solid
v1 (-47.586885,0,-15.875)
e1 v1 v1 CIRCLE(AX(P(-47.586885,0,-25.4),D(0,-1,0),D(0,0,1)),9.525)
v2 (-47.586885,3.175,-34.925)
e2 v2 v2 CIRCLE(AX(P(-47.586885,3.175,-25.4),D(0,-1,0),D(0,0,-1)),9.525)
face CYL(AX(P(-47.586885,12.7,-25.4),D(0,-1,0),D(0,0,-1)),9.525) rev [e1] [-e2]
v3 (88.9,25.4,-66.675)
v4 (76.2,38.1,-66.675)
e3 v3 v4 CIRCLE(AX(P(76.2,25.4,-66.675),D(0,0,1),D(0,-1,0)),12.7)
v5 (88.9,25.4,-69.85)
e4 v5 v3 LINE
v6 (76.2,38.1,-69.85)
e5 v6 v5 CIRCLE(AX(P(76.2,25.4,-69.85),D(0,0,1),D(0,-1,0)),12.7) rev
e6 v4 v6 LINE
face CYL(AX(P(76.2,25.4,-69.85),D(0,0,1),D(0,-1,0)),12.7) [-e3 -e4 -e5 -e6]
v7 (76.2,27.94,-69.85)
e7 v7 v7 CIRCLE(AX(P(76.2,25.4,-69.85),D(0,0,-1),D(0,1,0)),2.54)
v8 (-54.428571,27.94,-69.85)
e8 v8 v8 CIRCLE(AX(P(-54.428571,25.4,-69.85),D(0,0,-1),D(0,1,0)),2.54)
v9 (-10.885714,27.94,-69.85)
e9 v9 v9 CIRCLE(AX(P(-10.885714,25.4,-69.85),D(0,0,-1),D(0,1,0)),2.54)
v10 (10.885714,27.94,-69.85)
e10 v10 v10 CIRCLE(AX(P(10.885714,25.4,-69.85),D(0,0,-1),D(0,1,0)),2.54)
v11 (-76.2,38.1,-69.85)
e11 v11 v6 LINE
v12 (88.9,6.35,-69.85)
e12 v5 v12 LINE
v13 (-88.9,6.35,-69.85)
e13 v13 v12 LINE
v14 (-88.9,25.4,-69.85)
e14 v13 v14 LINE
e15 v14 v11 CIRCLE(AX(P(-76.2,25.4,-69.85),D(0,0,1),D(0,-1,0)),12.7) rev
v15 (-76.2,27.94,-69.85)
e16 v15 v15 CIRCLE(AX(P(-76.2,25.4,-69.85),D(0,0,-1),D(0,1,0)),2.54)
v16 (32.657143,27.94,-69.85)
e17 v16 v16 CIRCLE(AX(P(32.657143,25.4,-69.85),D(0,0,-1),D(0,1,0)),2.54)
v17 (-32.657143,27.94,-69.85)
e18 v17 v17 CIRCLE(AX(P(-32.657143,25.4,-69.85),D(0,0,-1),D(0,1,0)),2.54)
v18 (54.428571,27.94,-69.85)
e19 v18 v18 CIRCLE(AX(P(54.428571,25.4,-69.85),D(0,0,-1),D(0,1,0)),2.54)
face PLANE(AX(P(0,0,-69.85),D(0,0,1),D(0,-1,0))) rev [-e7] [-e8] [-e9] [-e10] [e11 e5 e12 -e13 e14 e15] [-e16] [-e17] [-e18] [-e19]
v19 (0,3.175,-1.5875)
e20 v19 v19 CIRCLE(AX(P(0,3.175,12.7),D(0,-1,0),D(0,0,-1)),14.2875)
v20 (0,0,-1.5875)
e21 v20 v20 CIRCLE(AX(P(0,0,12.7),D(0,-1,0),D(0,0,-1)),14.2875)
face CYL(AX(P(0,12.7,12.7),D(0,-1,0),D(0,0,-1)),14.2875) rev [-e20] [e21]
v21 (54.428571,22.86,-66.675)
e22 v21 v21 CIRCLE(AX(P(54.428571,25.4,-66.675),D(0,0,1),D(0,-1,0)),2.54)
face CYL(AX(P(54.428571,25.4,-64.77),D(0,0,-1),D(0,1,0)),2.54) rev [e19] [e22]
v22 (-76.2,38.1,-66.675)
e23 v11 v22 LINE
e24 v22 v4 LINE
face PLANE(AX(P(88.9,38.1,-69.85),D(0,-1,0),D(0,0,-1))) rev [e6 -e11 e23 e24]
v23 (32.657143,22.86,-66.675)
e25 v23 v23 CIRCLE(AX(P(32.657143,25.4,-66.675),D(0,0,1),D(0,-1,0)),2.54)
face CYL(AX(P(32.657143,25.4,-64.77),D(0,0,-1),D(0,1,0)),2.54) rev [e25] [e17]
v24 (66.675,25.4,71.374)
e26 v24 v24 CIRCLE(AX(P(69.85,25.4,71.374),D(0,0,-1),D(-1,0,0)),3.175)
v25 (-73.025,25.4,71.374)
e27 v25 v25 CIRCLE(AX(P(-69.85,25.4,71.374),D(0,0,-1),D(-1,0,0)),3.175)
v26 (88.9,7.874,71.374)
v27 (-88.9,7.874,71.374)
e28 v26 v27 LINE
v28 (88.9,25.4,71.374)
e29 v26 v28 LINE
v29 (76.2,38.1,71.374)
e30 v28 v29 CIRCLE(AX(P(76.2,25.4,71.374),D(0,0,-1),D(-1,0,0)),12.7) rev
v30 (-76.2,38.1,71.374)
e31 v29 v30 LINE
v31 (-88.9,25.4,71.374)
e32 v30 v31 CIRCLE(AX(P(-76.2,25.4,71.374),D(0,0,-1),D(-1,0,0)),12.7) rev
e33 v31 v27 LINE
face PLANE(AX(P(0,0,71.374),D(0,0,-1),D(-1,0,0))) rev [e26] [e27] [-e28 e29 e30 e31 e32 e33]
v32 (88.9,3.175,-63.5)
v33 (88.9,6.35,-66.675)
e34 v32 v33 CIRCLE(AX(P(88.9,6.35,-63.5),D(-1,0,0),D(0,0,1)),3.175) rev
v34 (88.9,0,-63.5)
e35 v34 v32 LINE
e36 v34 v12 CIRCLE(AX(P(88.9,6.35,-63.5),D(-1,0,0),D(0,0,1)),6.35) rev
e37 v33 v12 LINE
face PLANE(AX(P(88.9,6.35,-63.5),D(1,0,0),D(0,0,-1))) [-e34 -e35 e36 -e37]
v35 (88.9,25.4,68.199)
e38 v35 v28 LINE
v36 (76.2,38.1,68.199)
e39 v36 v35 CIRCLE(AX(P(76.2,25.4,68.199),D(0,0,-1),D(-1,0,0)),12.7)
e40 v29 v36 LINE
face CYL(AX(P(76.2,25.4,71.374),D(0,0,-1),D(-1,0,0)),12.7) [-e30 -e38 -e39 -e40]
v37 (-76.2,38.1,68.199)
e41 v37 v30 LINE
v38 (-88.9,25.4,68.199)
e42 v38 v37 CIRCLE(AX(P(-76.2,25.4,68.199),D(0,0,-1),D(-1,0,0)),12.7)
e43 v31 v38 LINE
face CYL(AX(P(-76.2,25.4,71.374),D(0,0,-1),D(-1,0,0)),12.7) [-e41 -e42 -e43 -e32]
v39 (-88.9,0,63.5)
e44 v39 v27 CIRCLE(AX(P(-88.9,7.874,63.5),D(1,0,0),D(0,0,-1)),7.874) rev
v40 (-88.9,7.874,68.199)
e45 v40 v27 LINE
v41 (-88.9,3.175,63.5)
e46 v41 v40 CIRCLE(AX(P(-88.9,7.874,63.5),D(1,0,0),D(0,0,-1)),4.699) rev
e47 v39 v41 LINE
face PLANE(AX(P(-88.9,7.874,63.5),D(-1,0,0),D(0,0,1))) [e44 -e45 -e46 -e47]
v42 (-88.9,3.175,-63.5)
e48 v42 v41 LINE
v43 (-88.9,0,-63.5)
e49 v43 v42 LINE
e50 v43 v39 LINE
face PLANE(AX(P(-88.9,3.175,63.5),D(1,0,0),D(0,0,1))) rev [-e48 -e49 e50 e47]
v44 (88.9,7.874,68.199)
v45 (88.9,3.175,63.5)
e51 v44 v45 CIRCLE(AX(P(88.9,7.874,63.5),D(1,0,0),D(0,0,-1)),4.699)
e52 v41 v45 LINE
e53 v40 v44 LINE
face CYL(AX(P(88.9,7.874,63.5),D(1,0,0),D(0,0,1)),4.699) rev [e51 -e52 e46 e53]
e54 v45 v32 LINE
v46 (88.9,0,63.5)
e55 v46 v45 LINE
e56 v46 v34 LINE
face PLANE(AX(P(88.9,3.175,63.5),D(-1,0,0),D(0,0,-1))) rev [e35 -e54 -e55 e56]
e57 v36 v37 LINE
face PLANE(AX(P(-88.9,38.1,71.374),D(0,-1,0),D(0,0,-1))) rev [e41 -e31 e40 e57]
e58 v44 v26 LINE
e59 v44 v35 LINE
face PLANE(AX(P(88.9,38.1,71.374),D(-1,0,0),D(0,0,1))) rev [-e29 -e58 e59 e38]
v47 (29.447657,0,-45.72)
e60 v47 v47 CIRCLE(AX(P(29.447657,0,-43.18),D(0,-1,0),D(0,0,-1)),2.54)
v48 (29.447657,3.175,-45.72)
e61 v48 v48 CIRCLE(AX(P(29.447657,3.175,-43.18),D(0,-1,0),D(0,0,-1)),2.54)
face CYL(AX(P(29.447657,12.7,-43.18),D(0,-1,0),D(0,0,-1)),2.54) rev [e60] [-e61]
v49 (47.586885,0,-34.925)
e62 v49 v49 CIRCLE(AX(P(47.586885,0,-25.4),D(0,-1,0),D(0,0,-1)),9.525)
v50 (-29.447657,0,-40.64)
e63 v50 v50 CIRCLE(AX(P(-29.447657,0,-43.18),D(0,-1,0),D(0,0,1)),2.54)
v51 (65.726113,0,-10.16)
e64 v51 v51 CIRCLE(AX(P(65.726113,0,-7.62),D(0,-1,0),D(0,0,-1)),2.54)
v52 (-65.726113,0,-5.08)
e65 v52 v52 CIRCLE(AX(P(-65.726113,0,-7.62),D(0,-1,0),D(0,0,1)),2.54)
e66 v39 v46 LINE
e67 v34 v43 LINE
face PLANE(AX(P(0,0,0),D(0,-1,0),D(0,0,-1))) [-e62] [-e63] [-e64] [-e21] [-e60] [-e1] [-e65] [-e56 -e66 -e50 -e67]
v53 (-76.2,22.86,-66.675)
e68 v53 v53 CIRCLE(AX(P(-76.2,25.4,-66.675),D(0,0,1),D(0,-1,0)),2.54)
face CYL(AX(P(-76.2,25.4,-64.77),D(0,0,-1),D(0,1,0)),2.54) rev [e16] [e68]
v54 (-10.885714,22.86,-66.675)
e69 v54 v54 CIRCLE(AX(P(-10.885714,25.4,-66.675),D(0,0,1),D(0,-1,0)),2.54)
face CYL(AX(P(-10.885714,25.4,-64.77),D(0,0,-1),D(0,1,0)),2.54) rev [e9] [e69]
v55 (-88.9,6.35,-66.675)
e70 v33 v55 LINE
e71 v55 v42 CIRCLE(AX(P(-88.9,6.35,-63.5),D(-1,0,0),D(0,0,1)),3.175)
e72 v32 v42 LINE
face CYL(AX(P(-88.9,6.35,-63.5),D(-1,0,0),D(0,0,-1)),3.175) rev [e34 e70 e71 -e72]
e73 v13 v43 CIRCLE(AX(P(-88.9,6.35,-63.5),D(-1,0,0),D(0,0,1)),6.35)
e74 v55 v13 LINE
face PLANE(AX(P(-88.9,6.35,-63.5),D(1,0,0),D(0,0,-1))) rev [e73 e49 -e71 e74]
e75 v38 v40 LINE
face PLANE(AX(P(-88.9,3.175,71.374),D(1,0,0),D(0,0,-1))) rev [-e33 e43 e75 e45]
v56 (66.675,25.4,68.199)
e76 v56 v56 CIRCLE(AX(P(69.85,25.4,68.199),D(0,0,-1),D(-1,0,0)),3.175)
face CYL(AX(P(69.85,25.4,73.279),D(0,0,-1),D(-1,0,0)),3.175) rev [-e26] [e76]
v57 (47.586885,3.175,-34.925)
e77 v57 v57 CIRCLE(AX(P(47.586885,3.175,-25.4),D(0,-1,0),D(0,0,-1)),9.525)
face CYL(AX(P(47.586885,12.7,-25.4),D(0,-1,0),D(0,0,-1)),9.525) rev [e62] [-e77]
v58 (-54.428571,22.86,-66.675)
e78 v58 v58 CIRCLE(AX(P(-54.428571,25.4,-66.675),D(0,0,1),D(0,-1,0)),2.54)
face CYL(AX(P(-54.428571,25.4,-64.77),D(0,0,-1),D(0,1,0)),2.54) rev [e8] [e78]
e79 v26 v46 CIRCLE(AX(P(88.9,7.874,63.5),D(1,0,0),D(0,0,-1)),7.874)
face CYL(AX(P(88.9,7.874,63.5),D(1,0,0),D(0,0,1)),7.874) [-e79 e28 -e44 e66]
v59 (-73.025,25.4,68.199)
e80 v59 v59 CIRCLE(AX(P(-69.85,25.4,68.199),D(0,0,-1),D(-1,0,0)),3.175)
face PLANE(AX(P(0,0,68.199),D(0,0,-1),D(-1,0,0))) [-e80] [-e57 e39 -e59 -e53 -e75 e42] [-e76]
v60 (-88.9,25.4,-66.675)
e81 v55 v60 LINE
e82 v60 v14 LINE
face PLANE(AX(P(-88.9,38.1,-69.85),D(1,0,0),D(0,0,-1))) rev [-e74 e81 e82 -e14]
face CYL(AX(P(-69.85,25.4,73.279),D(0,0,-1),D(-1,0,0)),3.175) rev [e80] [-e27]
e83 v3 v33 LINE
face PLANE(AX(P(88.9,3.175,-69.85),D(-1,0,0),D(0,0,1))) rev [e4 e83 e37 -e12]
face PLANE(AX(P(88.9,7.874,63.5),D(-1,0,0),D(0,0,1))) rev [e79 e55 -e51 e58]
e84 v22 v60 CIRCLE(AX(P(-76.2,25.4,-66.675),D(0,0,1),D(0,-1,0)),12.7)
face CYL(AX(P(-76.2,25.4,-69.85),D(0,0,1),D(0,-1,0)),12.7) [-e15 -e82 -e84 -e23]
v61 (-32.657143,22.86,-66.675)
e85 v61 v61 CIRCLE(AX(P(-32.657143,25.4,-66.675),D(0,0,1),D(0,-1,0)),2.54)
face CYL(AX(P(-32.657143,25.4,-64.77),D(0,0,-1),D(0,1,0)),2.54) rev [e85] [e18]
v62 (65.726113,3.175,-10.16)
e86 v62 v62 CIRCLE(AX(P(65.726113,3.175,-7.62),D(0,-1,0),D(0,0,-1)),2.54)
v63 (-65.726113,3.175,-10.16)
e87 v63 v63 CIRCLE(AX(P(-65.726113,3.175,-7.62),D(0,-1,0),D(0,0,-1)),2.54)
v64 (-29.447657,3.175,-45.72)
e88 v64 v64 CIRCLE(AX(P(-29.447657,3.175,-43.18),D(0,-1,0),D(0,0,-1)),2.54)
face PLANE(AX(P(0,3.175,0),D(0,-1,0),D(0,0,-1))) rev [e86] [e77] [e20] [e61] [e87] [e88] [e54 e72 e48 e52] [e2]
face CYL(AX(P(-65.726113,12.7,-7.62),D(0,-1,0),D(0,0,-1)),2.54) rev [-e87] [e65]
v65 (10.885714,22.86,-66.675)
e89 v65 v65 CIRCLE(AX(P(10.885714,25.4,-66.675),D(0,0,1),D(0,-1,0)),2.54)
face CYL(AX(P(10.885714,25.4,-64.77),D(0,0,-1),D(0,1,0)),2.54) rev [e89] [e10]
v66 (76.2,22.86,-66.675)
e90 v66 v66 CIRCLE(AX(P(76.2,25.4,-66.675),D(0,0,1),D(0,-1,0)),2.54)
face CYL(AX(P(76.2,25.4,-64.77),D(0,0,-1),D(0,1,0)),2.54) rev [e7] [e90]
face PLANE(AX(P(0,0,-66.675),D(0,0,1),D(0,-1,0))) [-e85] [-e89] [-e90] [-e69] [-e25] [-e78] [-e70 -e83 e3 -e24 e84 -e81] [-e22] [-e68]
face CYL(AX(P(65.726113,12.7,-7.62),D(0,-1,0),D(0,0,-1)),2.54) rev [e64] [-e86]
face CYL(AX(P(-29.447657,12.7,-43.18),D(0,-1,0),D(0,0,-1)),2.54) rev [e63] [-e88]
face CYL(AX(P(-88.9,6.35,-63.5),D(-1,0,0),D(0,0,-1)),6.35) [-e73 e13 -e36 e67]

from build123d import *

# Parameters (mm, degrees)
SKETCH1_W           = 177.8
SKETCH1_H           = 127
BOSS_EXTRUDE1_DEPTH = 3.175
EDGE_FLANGE1_DEPTH  = 177.8
EDGE_FLANGE2_DEPTH  = 177.8
SKETCH17_R          = 2.54
CUT_EXTRUDE1_DEPTH  = 5.08
FILLET1_R           = 12.7
SKETCH18_R          = 3.175
CUT_EXTRUDE2_DEPTH  = 5.08
SKETCH19_R          = 14.2875
CUT_EXTRUDE3_DEPTH  = 12.7
SKETCH20_R          = 9.525
CUT_EXTRUDE4_DEPTH  = 12.7
SKETCH21_R          = 2.54
CUT_EXTRUDE6_DEPTH  = 12.7


# Sheet-metal steps are written as plain solids
with BuildPart() as part:
    # Sketch1 → Boss-Extrude1 (new body)
    with BuildSketch(Plane(origin=(0, 0, 0), x_dir=(1, 0, 0), z_dir=(0, 1, 0))):
        Rectangle(SKETCH1_W, SKETCH1_H)
    extrude(amount=BOSS_EXTRUDE1_DEPTH)

    # Edge-Flange1 section (across the edge) → Edge-Flange1 (add)
    with BuildSketch(Plane(origin=(88.9, 3.175, -66.675), x_dir=(0, 0, 1), z_dir=(-1, 0, 0))):
        with BuildLine():
            Line((-3.175, 3.175), (-3.175, 34.925))
            Line((-3.175, 34.925), (0, 34.925))
            Line((0, 34.925), (0, 3.175))
            ThreePointArc((0, 3.175), (0.92993597, 0.92993597), (3.175, 0))
            Line((3.175, 0), (3.175, -3.175))
            ThreePointArc((3.175, -3.175), (-1.315128061, -1.315128061), (-3.175, 3.175))
        make_face()
    extrude(amount=EDGE_FLANGE1_DEPTH)

    # Edge-Flange2 section (across the edge) → Edge-Flange2 (add)
    with BuildSketch(Plane(origin=(-88.9, 3.175, 68.199), x_dir=(0, 0, -1), z_dir=(1, 0, 0))):
        with BuildLine():
            Line((-3.175, 4.699), (-3.175, 34.925))
            Line((-3.175, 34.925), (0, 34.925))
            Line((0, 34.925), (0, 4.699))
            ThreePointArc((0, 4.699), (1.376305235, 1.376305235), (4.699, 0))
            Line((4.699, 0), (4.699, -3.175))
            ThreePointArc((4.699, -3.175), (-0.868758795, -0.868758795), (-3.175, 4.699))
        make_face()
    extrude(amount=EDGE_FLANGE2_DEPTH)

    # Sketch17 → Cut-Extrude1 (cut)
    with BuildSketch(Plane(origin=(0, 0, -69.85), x_dir=(-1, 0, 0), z_dir=(0, 0, -1))):
        with Locations(Location((-76.2, 25.4, 0), (0, 0, 90))):
            Circle(SKETCH17_R)
        with Locations(Location((-54.428571429, 25.4, 0), (0, 0, 90))):
            Circle(SKETCH17_R)
        with Locations(Location((-32.657142857, 25.4, 0), (0, 0, 90))):
            Circle(SKETCH17_R)
        with Locations(Location((-10.885714286, 25.4, 0), (0, 0, 90))):
            Circle(SKETCH17_R)
        with Locations(Location((10.885714286, 25.4, 0), (0, 0, 90))):
            Circle(SKETCH17_R)
        with Locations(Location((32.657142857, 25.4, 0), (0, 0, 90))):
            Circle(SKETCH17_R)
        with Locations(Location((54.428571429, 25.4, 0), (0, 0, 90))):
            Circle(SKETCH17_R)
        with Locations(Location((76.2, 25.4, 0), (0, 0, 90))):
            Circle(SKETCH17_R)
    extrude(amount=-CUT_EXTRUDE1_DEPTH, mode=Mode.SUBTRACT)

    # Fillet1
    fillet1_edges = [part.edges().sort_by_distance(p)[0] for p in [
        (88.9, 38.1, -68.2625),
        (-88.9, 38.1, -68.2625),
        (-88.9, 38.1, 69.7865),
        (88.9, 38.1, 69.7865),
    ]]
    fillet(fillet1_edges, radius=FILLET1_R)

    # Sketch18 → Cut-Extrude2 (cut)
    with BuildSketch(Plane(origin=(0, 0, 68.199), x_dir=(-1, 0, 0), z_dir=(0, 0, -1))):
        with Locations((69.85, 25.4)):
            Circle(SKETCH18_R)
        with Locations((-69.85, 25.4)):
            Circle(SKETCH18_R)
    extrude(amount=-CUT_EXTRUDE2_DEPTH, mode=Mode.SUBTRACT)

    # Sketch19 → Cut-Extrude3 (cut)
    with BuildSketch(Plane(origin=(0, 0, 0), x_dir=(-1, 0, 0), z_dir=(0, -1, 0))):
        with Locations(Location((0, -12.7, 0), (0, 0, 90))):
            Circle(SKETCH19_R)
    extrude(amount=-CUT_EXTRUDE3_DEPTH, mode=Mode.SUBTRACT)

    # Sketch20 → Cut-Extrude4 (cut)
    with BuildSketch(Plane.XZ):
        with Locations(Location((47.586884748, -25.4, 0), (0, 0, 270))):
            Circle(SKETCH20_R)
        with Locations(Location((-47.586884748, -25.4, 0), (0, 0, 270))):
            Circle(SKETCH20_R)
    extrude(amount=-CUT_EXTRUDE4_DEPTH, mode=Mode.SUBTRACT)

    # Sketch21 → Cut-Extrude6 (cut)
    with BuildSketch(Plane(origin=(0, 0, 0), x_dir=(-1, 0, 0), z_dir=(0, -1, 0))):
        with Locations(Location((-65.726112956, 7.62, 0), (0, 0, 90))):
            Circle(SKETCH21_R)
        with Locations(Location((-29.447656539, 43.18, 0), (0, 0, 90))):
            Circle(SKETCH21_R)
        with Locations(Location((65.726112956, 7.62, 0), (0, 0, 90))):
            Circle(SKETCH21_R)
        with Locations(Location((29.447656539, 43.18, 0), (0, 0, 90))):
            Circle(SKETCH21_R)
    extrude(amount=-CUT_EXTRUDE6_DEPTH, mode=Mode.SUBTRACT)


solid = part.part
